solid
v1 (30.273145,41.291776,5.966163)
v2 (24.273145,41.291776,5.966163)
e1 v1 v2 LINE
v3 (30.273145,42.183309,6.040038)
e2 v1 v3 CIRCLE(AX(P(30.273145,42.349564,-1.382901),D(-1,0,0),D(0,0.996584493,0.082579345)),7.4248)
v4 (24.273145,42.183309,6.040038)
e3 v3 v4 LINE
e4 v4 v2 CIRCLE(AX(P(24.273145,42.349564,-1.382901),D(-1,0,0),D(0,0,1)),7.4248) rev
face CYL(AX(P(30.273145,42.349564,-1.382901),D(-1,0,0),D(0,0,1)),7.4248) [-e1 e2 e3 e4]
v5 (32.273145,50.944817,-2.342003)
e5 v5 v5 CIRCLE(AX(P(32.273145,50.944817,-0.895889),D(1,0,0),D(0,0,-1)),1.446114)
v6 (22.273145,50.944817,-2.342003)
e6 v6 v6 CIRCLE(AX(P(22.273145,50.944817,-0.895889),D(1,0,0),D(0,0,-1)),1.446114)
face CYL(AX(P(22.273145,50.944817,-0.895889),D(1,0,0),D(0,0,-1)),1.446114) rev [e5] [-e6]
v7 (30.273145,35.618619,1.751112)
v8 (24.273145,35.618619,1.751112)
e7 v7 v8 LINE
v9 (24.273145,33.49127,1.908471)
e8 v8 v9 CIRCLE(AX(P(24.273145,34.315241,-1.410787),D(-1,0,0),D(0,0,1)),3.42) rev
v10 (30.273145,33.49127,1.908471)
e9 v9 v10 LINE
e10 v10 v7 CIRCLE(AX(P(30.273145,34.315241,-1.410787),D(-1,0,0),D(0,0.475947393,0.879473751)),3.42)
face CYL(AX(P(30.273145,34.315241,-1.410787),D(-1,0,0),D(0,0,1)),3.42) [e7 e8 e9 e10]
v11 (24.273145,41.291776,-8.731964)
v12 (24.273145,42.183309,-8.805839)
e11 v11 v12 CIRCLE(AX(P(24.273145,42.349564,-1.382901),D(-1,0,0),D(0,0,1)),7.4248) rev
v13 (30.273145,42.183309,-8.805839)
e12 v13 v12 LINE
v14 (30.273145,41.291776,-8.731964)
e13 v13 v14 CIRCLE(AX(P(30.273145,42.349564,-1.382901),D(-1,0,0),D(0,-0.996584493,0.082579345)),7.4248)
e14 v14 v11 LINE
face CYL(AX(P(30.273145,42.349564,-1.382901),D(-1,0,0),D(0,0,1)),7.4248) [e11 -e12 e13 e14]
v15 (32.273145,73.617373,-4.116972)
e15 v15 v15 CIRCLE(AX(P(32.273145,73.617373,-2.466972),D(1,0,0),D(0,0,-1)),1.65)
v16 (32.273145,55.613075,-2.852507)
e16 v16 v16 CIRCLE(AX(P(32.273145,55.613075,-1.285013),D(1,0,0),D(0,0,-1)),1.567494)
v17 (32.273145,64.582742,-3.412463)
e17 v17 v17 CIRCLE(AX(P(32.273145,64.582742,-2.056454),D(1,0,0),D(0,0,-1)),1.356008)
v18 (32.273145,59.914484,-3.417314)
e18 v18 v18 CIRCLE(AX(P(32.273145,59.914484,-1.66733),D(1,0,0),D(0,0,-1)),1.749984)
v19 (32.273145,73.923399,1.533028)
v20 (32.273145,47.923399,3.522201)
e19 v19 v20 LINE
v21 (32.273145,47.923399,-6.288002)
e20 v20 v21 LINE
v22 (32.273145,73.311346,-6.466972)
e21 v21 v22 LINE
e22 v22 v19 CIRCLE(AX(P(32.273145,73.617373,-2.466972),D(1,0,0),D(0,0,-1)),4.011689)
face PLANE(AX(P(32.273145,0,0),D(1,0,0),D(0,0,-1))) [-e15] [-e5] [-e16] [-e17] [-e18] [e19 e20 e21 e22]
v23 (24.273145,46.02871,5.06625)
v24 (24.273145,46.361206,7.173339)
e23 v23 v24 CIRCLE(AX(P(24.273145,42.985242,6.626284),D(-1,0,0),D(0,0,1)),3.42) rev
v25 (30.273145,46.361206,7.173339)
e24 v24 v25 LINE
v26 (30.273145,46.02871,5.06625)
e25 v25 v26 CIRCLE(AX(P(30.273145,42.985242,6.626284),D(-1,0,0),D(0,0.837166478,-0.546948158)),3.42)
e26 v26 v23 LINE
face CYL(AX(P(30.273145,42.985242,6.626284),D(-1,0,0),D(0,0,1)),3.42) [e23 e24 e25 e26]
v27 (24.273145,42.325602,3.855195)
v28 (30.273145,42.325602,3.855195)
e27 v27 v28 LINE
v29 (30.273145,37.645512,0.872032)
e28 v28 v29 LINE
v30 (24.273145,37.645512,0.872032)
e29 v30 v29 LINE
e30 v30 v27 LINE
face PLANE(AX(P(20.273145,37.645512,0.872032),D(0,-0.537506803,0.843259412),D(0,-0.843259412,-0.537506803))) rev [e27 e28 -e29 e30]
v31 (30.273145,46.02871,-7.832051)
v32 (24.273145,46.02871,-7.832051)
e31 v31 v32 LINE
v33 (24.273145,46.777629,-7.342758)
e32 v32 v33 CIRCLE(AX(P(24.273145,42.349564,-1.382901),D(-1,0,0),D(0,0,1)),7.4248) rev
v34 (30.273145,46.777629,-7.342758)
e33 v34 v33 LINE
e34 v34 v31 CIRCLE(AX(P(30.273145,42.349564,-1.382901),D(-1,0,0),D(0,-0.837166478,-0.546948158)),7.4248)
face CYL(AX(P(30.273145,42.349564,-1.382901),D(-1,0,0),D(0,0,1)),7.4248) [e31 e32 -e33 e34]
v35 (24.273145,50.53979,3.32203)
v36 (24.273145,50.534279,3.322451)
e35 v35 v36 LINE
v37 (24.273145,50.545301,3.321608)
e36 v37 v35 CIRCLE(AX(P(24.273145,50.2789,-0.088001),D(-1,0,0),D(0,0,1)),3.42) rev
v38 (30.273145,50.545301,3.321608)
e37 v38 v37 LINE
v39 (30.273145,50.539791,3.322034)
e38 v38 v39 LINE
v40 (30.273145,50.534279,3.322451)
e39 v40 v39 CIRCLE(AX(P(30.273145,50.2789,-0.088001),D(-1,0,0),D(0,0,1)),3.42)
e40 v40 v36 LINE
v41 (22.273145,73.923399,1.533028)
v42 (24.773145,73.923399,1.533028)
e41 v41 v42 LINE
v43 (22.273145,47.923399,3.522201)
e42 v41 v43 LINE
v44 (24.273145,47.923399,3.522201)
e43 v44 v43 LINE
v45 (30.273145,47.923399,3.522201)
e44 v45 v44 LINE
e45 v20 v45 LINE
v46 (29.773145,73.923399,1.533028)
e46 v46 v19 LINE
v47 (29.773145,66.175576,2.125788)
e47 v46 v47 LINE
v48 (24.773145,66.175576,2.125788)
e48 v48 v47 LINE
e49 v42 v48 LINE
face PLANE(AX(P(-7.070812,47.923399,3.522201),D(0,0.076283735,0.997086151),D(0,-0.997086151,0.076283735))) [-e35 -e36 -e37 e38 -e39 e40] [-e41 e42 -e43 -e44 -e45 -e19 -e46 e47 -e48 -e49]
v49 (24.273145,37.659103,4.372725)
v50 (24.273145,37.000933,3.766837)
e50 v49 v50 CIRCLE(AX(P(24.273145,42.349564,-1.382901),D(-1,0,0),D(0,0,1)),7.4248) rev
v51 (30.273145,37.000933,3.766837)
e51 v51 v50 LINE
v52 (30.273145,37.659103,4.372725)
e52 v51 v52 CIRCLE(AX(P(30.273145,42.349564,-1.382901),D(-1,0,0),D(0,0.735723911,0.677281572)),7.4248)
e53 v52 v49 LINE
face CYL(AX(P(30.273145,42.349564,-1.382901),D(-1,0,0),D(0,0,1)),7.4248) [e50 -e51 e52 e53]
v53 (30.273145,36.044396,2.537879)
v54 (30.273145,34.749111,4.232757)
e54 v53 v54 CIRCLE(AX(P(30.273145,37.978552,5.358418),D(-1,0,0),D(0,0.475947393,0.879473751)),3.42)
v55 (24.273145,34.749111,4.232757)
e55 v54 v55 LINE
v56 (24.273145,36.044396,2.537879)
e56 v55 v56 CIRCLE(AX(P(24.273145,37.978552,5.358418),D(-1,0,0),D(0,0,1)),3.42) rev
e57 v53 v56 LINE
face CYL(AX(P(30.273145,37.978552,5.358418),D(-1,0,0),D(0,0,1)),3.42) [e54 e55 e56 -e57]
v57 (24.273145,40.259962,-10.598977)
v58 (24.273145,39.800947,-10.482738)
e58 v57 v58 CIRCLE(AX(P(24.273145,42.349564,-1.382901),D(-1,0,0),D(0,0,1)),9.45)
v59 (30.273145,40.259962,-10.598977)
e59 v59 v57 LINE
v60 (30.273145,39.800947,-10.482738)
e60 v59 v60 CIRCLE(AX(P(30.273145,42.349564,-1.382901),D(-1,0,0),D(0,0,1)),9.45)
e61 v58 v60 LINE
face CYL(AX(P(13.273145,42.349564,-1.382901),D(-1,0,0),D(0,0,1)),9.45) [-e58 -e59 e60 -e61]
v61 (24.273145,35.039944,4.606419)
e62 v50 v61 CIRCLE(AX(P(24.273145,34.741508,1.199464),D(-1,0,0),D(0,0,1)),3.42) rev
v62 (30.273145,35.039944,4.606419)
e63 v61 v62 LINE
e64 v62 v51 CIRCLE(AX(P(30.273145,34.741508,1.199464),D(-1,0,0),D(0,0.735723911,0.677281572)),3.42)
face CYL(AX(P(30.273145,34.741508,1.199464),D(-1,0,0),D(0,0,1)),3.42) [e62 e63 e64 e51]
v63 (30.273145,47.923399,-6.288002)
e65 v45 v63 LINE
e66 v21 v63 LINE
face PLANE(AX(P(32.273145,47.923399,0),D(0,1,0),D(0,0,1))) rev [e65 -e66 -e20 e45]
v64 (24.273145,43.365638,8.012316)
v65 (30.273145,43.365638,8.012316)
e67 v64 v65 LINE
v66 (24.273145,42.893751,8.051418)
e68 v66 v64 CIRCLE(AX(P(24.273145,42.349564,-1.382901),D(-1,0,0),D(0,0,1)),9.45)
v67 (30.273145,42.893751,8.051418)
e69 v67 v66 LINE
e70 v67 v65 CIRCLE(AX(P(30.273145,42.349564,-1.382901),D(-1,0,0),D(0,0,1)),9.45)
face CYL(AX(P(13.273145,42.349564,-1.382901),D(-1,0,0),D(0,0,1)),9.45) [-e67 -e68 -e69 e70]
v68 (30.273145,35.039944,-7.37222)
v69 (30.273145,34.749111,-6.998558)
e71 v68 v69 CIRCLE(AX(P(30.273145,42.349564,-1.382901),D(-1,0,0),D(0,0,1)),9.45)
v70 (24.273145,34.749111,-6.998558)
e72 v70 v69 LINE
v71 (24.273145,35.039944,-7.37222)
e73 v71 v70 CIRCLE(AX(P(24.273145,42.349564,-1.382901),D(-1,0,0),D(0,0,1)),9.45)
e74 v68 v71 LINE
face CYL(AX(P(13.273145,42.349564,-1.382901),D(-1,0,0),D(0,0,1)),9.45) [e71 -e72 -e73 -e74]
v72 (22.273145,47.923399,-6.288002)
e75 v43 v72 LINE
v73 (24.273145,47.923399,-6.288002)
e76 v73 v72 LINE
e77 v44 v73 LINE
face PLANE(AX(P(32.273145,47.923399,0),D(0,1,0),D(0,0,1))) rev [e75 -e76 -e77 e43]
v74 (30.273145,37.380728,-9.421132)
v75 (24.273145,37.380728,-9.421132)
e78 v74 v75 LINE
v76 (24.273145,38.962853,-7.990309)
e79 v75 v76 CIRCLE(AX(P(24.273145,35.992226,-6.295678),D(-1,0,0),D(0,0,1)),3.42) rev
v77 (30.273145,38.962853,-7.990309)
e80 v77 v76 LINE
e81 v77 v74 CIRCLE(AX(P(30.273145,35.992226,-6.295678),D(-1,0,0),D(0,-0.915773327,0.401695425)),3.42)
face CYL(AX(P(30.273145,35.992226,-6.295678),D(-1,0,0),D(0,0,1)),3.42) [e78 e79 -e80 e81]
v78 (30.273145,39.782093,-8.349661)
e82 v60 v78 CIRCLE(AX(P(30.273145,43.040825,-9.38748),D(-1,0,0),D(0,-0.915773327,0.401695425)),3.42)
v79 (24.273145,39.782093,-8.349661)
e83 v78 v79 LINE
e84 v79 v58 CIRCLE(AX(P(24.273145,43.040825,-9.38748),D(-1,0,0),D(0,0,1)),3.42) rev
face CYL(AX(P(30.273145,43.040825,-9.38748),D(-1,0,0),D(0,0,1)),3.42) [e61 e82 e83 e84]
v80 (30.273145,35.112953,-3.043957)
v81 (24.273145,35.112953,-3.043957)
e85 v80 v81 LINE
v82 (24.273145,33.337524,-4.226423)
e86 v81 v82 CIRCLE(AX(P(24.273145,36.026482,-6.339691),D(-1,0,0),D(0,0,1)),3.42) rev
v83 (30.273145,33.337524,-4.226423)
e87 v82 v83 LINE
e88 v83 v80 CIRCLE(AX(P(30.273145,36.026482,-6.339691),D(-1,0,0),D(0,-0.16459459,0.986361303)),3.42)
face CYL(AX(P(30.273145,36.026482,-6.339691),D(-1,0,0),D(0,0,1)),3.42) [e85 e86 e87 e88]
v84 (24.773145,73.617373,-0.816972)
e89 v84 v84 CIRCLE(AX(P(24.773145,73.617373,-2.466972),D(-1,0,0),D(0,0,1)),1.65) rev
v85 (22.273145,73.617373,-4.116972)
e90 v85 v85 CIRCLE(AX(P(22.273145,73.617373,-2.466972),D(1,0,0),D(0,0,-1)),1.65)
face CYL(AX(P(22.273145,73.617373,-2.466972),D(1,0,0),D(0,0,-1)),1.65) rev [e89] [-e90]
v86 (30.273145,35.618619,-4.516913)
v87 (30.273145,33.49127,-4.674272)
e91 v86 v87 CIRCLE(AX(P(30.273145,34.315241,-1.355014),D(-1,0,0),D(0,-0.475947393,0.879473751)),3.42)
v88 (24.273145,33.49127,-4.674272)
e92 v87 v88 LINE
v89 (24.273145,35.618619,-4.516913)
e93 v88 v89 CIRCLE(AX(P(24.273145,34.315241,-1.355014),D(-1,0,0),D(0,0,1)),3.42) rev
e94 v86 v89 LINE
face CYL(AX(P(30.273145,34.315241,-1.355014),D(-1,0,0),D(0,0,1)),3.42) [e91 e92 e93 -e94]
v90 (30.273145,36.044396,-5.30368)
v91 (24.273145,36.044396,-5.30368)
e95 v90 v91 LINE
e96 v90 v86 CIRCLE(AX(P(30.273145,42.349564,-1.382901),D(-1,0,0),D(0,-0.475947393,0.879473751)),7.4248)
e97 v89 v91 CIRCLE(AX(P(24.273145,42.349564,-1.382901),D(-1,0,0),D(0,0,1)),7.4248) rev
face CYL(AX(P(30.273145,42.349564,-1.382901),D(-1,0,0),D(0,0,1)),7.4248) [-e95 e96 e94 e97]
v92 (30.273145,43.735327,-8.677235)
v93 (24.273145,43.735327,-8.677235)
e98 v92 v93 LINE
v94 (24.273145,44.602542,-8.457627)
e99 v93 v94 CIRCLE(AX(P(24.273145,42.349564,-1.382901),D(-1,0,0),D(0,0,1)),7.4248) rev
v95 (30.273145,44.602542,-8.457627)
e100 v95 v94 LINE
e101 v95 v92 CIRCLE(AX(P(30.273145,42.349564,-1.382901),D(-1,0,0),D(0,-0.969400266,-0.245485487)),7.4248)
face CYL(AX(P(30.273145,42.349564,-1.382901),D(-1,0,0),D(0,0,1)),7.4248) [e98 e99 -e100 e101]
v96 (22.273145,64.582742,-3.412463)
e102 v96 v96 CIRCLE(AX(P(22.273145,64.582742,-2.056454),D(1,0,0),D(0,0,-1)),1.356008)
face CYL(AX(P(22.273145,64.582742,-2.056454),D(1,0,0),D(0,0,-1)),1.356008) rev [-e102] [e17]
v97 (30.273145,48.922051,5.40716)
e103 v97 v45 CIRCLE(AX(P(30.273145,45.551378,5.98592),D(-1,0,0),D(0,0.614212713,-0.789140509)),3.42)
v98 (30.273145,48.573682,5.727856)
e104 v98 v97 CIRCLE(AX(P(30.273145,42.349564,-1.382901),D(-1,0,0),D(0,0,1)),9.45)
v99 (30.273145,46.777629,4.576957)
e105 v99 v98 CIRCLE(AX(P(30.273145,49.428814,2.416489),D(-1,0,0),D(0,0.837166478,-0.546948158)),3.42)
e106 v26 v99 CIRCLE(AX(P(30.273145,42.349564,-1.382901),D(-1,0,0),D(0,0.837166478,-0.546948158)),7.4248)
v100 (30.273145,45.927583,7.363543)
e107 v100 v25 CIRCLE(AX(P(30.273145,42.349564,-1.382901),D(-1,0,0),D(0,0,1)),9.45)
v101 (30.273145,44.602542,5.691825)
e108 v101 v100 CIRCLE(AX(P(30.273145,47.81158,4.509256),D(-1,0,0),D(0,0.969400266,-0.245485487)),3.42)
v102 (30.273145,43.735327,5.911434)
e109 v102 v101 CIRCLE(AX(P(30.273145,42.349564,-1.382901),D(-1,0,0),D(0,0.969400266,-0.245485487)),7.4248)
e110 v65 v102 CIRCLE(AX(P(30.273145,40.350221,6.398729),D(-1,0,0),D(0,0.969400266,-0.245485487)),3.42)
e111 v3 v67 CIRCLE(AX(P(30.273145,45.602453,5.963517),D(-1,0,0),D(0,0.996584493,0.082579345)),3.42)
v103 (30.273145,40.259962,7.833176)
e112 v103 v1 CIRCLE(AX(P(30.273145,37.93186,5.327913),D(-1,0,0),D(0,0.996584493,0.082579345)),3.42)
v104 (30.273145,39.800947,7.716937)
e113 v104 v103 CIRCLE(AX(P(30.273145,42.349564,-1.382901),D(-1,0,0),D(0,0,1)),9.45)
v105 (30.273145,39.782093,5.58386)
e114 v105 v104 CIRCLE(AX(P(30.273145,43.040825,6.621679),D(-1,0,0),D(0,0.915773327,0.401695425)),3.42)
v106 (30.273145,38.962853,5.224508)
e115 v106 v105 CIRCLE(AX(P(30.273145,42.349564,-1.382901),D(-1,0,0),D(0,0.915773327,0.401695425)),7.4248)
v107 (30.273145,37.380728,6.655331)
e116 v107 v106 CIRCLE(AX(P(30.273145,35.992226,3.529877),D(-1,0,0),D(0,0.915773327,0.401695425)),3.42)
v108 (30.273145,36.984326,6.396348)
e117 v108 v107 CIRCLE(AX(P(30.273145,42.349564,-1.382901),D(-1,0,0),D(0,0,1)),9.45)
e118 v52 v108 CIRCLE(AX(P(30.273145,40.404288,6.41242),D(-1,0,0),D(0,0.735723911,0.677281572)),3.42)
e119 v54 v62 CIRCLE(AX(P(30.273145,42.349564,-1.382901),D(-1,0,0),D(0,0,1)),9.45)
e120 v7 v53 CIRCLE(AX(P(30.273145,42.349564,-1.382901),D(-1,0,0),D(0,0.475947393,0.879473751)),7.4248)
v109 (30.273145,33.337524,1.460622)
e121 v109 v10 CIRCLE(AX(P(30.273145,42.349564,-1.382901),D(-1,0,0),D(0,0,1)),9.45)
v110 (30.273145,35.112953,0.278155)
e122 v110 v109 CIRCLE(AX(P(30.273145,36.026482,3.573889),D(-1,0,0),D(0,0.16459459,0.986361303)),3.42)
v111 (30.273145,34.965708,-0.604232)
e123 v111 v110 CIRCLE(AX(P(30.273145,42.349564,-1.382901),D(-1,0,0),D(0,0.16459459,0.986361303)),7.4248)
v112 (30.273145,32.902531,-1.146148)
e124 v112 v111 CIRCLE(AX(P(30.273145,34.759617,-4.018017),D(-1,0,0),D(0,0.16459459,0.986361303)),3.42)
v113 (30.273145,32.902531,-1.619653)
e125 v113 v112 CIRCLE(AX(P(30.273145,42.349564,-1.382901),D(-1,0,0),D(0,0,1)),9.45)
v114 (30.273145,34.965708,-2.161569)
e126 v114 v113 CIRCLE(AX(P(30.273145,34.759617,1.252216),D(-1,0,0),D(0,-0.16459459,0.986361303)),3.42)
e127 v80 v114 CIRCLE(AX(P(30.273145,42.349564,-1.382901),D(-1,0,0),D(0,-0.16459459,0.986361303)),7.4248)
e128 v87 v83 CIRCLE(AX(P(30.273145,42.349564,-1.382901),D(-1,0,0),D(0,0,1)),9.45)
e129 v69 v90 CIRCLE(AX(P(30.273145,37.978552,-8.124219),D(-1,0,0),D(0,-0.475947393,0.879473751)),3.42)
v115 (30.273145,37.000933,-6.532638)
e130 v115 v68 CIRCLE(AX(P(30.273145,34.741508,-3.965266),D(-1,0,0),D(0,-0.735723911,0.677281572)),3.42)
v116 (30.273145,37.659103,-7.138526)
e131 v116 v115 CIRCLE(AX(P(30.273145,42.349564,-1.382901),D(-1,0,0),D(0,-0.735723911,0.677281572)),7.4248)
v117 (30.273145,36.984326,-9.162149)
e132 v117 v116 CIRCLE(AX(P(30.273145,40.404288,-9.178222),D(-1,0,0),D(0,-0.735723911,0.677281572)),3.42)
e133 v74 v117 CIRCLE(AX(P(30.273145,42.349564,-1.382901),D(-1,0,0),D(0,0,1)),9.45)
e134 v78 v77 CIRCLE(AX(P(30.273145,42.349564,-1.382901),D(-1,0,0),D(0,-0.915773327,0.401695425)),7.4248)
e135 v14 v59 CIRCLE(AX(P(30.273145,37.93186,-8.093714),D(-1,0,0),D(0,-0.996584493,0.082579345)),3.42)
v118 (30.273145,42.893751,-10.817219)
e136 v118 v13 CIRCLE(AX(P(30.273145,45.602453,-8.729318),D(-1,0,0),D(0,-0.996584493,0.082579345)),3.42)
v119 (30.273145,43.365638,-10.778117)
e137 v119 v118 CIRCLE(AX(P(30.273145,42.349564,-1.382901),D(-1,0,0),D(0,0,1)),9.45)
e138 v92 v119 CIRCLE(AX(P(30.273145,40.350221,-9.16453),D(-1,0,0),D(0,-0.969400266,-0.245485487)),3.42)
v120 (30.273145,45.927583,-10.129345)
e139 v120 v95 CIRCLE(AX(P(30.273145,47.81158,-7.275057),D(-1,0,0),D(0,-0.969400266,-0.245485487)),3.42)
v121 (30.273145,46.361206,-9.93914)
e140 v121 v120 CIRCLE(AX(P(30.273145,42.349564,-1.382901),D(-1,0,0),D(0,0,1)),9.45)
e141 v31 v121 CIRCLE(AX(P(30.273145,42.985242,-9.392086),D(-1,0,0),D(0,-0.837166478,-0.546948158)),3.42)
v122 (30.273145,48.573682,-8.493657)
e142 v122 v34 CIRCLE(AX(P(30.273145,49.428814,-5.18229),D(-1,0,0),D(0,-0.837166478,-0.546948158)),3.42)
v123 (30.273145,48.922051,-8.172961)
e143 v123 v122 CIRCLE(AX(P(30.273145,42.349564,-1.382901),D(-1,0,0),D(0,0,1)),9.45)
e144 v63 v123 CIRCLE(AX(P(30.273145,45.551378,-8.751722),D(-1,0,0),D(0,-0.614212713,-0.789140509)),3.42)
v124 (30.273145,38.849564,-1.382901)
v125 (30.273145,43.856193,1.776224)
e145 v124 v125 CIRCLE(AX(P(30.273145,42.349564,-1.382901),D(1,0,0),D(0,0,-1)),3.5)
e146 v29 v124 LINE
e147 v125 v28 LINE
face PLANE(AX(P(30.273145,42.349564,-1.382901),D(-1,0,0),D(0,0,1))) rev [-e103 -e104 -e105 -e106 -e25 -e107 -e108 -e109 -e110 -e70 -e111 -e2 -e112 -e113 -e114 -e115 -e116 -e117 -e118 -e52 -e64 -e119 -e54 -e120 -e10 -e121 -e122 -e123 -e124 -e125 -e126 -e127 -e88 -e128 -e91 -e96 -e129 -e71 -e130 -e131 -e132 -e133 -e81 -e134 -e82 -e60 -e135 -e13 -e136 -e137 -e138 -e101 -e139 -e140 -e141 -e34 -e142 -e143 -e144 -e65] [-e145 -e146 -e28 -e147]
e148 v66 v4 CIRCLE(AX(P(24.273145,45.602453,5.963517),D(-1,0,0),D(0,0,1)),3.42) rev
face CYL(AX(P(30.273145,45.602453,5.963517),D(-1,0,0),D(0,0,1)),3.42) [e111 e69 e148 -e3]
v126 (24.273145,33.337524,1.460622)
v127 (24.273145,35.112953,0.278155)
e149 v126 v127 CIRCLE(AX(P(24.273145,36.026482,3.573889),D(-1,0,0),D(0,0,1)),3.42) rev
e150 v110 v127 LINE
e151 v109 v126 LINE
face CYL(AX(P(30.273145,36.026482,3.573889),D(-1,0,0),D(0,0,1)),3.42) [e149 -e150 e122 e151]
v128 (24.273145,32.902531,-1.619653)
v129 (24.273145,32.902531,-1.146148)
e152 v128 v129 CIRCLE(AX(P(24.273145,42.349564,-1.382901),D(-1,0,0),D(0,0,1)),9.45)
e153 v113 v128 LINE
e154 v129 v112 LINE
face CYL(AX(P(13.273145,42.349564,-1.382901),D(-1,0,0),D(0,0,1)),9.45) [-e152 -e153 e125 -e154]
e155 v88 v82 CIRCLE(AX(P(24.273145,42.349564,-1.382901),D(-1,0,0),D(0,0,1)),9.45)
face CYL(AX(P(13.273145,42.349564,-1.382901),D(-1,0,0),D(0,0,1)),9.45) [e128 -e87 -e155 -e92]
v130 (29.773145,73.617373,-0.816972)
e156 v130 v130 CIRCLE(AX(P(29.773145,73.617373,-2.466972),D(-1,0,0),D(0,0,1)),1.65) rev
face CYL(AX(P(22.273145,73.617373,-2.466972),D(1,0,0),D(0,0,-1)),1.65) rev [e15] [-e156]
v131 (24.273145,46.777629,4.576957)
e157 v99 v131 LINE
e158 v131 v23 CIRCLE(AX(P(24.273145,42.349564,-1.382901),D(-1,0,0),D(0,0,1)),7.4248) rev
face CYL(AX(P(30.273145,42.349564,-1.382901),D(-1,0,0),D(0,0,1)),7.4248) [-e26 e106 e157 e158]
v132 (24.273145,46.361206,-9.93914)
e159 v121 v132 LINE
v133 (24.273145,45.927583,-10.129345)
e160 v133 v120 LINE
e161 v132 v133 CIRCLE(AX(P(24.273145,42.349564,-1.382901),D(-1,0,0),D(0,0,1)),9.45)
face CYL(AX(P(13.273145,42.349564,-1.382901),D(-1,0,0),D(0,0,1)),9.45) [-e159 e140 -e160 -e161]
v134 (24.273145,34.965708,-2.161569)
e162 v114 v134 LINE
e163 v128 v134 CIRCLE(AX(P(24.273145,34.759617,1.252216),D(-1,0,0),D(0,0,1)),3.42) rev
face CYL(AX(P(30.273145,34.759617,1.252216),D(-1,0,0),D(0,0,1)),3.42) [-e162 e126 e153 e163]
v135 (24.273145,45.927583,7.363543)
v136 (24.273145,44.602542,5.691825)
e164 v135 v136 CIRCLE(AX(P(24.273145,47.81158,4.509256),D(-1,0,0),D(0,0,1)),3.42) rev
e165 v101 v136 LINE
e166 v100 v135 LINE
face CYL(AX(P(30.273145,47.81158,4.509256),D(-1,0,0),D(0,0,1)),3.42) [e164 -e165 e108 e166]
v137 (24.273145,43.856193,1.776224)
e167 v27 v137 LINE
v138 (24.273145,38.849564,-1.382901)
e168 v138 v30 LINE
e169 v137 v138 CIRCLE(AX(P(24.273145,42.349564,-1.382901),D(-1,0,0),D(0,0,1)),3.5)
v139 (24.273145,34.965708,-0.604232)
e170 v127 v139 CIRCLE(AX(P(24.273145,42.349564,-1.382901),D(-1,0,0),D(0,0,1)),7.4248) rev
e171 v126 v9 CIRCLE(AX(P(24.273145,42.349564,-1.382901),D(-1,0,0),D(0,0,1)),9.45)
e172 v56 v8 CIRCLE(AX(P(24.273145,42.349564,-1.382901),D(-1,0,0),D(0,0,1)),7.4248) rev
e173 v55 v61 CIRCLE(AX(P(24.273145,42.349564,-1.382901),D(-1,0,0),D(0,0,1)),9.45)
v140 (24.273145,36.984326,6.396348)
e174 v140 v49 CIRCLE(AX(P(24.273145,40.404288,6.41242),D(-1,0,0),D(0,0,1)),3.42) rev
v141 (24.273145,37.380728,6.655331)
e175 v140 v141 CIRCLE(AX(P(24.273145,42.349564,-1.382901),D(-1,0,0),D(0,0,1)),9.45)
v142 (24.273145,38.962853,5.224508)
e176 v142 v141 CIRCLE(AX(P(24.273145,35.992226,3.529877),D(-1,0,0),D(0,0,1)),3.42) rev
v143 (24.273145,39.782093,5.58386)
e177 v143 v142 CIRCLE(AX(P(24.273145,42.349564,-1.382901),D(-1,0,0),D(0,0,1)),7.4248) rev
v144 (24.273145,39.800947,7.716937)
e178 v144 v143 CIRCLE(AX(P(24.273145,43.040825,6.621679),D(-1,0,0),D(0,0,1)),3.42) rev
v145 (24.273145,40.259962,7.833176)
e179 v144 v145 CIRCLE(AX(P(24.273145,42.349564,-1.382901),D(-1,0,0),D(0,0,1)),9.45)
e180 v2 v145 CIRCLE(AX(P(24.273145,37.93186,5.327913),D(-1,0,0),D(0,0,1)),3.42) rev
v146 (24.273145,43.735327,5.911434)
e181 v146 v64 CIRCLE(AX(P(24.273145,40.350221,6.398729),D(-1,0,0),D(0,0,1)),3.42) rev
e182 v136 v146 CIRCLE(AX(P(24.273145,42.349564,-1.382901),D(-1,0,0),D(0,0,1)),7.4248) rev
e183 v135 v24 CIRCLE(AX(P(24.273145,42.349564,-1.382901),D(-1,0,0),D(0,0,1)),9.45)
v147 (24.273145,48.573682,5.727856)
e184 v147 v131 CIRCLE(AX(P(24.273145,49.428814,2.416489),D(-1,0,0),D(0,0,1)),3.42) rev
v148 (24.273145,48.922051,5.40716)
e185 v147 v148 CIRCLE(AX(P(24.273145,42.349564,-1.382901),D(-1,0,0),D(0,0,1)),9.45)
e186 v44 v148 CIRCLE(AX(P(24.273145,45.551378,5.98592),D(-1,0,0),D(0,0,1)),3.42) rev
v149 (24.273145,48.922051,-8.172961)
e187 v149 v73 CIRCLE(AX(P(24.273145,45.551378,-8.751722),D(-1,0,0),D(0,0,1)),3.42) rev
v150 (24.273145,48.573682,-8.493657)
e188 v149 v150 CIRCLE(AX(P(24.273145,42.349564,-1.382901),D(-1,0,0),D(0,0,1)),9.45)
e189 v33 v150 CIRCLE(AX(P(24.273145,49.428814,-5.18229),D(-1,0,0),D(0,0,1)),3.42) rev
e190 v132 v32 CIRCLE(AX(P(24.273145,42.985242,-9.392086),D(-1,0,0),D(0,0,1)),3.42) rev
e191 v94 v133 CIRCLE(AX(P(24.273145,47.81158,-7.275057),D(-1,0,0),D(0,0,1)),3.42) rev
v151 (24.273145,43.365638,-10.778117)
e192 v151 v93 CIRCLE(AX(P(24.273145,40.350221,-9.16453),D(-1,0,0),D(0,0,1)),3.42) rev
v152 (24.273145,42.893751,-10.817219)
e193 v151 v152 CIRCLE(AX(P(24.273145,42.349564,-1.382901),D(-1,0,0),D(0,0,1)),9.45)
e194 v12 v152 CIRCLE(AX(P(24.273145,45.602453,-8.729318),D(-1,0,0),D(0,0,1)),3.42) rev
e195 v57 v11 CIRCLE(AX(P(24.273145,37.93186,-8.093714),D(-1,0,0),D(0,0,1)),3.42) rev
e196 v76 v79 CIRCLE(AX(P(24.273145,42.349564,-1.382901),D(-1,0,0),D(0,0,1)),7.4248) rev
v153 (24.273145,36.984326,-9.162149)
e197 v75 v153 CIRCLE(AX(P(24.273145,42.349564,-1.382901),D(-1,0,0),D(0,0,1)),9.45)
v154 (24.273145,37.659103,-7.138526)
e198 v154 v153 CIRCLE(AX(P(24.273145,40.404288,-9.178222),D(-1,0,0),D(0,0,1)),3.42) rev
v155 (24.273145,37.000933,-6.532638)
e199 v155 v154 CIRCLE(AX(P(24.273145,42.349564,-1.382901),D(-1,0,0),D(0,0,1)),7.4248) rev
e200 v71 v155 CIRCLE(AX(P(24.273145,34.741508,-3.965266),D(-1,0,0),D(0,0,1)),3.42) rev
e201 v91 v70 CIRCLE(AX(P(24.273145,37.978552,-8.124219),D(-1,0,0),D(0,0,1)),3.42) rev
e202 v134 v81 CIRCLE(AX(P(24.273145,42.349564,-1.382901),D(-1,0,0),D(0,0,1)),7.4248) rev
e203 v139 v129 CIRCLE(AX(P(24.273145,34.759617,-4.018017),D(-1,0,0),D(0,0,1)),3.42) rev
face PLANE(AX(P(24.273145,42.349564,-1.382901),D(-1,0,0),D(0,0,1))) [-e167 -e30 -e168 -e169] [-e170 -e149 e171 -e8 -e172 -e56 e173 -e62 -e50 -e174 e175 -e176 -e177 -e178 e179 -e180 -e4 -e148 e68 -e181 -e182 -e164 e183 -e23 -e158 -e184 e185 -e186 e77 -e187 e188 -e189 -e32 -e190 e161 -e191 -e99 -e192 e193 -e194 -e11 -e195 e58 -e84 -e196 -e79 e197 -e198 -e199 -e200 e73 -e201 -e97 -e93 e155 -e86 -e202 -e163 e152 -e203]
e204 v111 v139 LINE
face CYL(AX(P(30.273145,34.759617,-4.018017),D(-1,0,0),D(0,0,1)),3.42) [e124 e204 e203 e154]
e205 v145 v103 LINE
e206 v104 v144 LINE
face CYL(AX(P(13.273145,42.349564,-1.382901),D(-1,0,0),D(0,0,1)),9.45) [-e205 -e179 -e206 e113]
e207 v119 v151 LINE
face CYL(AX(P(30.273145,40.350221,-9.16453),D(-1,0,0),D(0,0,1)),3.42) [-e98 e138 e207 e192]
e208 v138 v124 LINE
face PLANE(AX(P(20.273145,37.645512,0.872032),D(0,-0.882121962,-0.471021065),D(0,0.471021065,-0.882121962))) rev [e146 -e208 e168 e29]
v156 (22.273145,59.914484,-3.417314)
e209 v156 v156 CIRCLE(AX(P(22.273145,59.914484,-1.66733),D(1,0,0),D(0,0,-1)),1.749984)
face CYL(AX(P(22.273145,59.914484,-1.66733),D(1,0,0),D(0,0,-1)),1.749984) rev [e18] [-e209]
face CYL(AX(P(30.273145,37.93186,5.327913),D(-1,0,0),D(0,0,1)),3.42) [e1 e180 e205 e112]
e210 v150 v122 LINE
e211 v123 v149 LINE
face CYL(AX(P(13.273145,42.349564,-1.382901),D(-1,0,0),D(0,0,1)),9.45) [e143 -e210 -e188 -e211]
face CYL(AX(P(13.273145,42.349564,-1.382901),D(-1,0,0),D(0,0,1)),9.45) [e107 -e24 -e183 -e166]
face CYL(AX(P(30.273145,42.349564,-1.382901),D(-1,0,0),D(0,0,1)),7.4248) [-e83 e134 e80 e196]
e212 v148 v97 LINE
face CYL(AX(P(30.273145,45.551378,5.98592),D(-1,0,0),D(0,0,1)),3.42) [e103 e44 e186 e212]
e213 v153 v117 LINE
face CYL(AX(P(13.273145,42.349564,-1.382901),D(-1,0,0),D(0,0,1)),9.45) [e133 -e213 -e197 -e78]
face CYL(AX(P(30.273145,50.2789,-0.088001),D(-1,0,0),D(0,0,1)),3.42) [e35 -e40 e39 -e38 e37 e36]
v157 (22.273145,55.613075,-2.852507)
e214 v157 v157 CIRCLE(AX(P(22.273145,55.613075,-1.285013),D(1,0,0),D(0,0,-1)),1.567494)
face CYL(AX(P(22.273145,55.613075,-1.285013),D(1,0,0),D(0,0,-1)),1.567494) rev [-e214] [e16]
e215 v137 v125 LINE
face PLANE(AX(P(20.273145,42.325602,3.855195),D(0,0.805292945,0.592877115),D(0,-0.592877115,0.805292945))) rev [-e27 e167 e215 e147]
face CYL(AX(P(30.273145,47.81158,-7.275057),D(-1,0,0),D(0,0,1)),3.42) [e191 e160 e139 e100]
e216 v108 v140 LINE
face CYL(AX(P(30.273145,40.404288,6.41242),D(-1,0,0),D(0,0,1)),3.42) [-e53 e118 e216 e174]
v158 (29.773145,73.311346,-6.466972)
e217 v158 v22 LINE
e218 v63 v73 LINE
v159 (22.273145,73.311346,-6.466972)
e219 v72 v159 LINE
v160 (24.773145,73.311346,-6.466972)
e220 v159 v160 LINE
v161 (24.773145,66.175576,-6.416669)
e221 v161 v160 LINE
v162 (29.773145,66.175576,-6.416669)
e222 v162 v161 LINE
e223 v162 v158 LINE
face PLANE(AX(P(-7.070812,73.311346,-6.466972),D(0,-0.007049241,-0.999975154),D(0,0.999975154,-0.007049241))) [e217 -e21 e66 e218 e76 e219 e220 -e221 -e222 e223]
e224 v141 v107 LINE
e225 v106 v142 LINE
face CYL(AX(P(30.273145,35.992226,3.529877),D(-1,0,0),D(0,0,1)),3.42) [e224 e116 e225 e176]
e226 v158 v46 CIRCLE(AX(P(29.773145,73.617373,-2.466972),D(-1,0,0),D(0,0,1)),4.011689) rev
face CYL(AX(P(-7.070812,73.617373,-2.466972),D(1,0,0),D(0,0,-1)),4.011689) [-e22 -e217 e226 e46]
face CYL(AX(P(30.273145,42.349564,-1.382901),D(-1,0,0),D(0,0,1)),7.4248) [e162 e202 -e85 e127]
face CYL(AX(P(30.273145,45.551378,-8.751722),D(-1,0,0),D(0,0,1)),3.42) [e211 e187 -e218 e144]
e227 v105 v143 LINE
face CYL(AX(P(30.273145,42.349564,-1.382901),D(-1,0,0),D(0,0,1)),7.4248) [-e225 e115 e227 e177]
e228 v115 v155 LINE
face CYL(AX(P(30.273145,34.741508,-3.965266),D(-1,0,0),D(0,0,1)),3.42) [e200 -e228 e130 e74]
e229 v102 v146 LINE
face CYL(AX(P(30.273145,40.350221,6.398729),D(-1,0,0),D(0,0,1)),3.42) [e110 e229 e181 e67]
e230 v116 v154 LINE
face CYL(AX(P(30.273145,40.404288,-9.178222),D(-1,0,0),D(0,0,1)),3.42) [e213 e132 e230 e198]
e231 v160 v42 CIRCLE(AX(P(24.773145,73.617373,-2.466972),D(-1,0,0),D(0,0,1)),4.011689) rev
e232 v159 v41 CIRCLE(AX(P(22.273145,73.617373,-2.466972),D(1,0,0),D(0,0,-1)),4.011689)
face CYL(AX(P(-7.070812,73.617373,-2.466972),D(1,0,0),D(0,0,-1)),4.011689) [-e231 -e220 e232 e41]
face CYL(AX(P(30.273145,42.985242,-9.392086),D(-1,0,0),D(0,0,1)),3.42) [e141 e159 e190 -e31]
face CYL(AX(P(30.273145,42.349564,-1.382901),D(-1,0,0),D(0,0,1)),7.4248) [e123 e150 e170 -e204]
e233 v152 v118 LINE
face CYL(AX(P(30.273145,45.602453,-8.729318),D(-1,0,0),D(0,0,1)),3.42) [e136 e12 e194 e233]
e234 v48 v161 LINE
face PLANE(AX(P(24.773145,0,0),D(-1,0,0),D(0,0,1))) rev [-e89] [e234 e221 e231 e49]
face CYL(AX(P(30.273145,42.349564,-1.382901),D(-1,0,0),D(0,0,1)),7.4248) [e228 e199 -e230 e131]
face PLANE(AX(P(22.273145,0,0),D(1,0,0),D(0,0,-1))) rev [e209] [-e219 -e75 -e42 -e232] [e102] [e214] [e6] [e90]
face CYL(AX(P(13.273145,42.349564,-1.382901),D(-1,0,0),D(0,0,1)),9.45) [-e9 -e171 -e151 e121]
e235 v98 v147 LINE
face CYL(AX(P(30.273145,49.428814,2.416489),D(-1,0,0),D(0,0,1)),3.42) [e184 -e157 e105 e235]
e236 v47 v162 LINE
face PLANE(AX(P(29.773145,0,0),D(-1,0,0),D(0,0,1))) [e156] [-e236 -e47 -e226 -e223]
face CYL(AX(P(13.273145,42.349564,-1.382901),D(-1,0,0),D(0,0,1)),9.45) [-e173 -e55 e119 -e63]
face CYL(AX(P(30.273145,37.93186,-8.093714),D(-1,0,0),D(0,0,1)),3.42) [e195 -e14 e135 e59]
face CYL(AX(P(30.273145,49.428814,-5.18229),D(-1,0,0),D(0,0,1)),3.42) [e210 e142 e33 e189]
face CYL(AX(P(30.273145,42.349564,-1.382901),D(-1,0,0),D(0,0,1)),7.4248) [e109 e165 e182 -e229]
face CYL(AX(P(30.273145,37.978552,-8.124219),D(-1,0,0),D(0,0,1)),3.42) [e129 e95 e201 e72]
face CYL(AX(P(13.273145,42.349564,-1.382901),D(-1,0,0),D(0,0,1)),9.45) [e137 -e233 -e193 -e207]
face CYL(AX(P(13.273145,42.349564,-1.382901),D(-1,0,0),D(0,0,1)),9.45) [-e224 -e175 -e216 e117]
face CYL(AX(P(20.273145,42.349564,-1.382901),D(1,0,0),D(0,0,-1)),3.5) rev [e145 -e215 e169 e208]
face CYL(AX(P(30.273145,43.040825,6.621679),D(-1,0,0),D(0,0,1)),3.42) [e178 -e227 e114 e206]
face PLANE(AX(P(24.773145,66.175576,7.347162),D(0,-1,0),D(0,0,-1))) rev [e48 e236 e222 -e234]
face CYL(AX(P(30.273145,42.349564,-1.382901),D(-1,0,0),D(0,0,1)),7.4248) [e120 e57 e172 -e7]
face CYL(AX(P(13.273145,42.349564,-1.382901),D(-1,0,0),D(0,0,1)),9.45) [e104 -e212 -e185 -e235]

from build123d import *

# Parameters (mm, degrees)
SPUR_START             = -32.726855157
SPUR_GEAR_GB_OUTLINE_R = 22.5
SPUR_GEAR_GB_DEPTH     = 75
SKETCH_2_R             = 56.152658256
CUT_EXTRUDE_1_DEPTH    = 45
EXTRUDE_1_DEPTH        = 30
EXTRUDE_START          = -30
SKETCH_5_R             = 22.5
EXTRUDE_2_DEPTH        = 30
SCALE_1_SCALE          = 0.2
CUT_EXTRUDE_3_DEPTH    = 10
EXTRUDE_3_DEPTH        = 5
SKETCH_8_R             = 1.65
CUT_EXTRUDE_4_DEPTH    = 10
SKETCH_9_W             = 18.454746183
SKETCH_9_H             = 13.449677925
CUT_EXTRUDE_5_DEPTH    = 2.5
SKETCH_10_R            = 1.446114005
SKETCH_10_R_2          = 1.567494057
SKETCH_10_R_3          = 1.749983797
SKETCH_10_R_4          = 1.35600832
CUT_EXTRUDE_6_DEPTH    = 80.014451116


# Read off the part's stored shape, not the designer's step: spur gear_gb
with BuildPart() as part:
    # spur gear_gb outline → spur gear_gb (new body)
    with BuildSketch(Plane.YZ.offset(SPUR_START)):
        with BuildLine():
            ThreePointArc((32.862431273, 33.858374177), (32.001554259, 34.671025411), (31.120587981, 35.461853886))
            ThreePointArc((31.120587981, 35.461853886), (26.170323532, 33.302671085), (22.140322459, 29.707357493))
            ThreePointArc((22.140322459, 29.707357493), (20.304903422, 30.987038971), (18.395725829, 32.153824573))
            ThreePointArc((18.395725829, 32.153824573), (20.069385125, 37.288613083), (20.058208562, 42.689267077))
            ThreePointArc((20.058208562, 42.689267077), (18.980108815, 43.178360316), (17.890094133, 43.64029024))
            ThreePointArc((17.890094133, 43.64029024), (13.909134176, 39.99074968), (11.264886092, 35.281700885))
            ThreePointArc((11.264886092, 35.281700885), (9.113403224, 35.896086104), (6.928815473, 36.379743093))
            ThreePointArc((6.928815473, 36.379743093), (6.844528189, 41.779750883), (5.080367717, 46.884153523))
            ThreePointArc((5.080367717, 46.884153523), (3.901874073, 46.996687926), (2.720930993, 47.079662024))
            ThreePointArc((2.720930993, 47.079662024), (0.14067431, 42.335248053), (-0.831275476, 37.022762562))
            ThreePointArc((-0.831275476, 37.022762562), (-3.065675621, 36.90527335), (-5.28893955, 36.653389986))
            ThreePointArc((-5.28893955, 36.653389986), (-7.12203958, 41.733442422), (-10.448009799, 45.988452479))
            ThreePointArc((-10.448009799, 45.988452479), (-11.599189267, 45.712233197), (-12.74308724, 45.407259939))
            ThreePointArc((-12.74308724, 45.407259939), (-13.643029801, 40.082103428), (-12.837355447, 34.741871474))
            ThreePointArc((-12.837355447, 34.741871474), (-14.912540945, 33.90523961), (-16.933555907, 32.945111364))
            ThreePointArc((-16.933555907, 32.945111364), (-20.316823851, 37.154705941), (-24.844183336, 40.099227051))
            ThreePointArc((-24.844183336, 40.099227051), (-25.843300471, 39.464186729), (-26.826194241, 38.804314699))
            ThreePointArc((-26.826194241, 38.804314699), (-25.948299939, 33.475478984), (-23.452308764, 28.686197563))
            ThreePointArc((-23.452308764, 28.686197563), (-25.143401065, 27.221085091), (-26.74315873, 25.656756756))
            ThreePointArc((-26.74315873, 25.656756756), (-31.309965009, 28.539718582), (-36.548104111, 29.854666195))
            ThreePointArc((-36.548104111, 29.854666195), (-37.286889069, 28.929621306), (-38.002266845, 27.986357877))
            ThreePointArc((-38.002266845, 27.986357877), (-35.44166915, 23.231304993), (-31.525840525, 19.51196706))
            ThreePointArc((-31.525840525, 19.51196706), (-32.64958354, 17.577141651), (-33.654725342, 15.578132475))
            ThreePointArc((-33.654725342, 15.578132475), (-38.910185635, 16.822047902), (-44.291470704, 16.364927041))
            ThreePointArc((-44.291470704, 16.364927041), (-44.68986467, 15.250120552), (-45.060204171, 14.125682952))
            ThreePointArc((-45.060204171, 14.125682952), (-41.094383574, 10.459696662), (-36.183058293, 8.213350193))
            ThreePointArc((-36.183058293, 8.213350193), (-36.617677028, 6.018480201), (-36.919280256, 3.801413847))
            ThreePointArc((-36.919280256, 3.801413847), (-42.293883893, 3.271485337), (-47.235169193, 1.091832139))
            ThreePointArc((-47.235169193, 1.091832139), (-47.25, -0.091929368), (-47.235169193, -1.275690876))
            ThreePointArc((-47.235169193, -1.275690876), (-42.293883893, -3.455344074), (-36.919280256, -3.985272584))
            ThreePointArc((-36.919280256, -3.985272584), (-36.617677028, -6.202338938), (-36.183058293, -8.39720893))
            ThreePointArc((-36.183058293, -8.39720893), (-41.094383574, -10.643555399), (-45.060204171, -14.309541689))
            ThreePointArc((-45.060204171, -14.309541689), (-44.68986467, -15.433979288), (-44.291470704, -16.548785777))
            ThreePointArc((-44.291470704, -16.548785777), (-38.910185635, -17.005906639), (-33.654725342, -15.761991212))
            ThreePointArc((-33.654725342, -15.761991212), (-32.64958354, -17.761000388), (-31.525840525, -19.695825796))
            ThreePointArc((-31.525840525, -19.695825796), (-35.44166915, -23.41516373), (-38.002266845, -28.170216613))
            ThreePointArc((-38.002266845, -28.170216613), (-37.286889069, -29.113480043), (-36.548104111, -30.038524932))
            ThreePointArc((-36.548104111, -30.038524932), (-31.309965009, -28.723577319), (-26.74315873, -25.840615493))
            ThreePointArc((-26.74315873, -25.840615493), (-25.143401065, -27.404943828), (-23.452308764, -28.870056299))
            ThreePointArc((-23.452308764, -28.870056299), (-25.948299939, -33.65933772), (-26.826194241, -38.988173435))
            ThreePointArc((-26.826194241, -38.988173435), (-25.843300471, -39.648045466), (-24.844183336, -40.283085788))
            ThreePointArc((-24.844183336, -40.283085788), (-20.316823851, -37.338564677), (-16.933555907, -33.128970101))
            ThreePointArc((-16.933555907, -33.128970101), (-14.912540945, -34.089098347), (-12.837355447, -34.925730211))
            ThreePointArc((-12.837355447, -34.925730211), (-13.643029801, -40.265962164), (-12.74308724, -45.591118675))
            ThreePointArc((-12.74308724, -45.591118675), (-11.599189267, -45.896091934), (-10.448009799, -46.172311216))
            ThreePointArc((-10.448009799, -46.172311216), (-7.12203958, -41.917301159), (-5.28893955, -36.837248723))
            ThreePointArc((-5.28893955, -36.837248723), (-3.065675621, -37.089132087), (-0.831275476, -37.206621299))
            ThreePointArc((-0.831275476, -37.206621299), (0.14067431, -42.51910679), (2.720930993, -47.263520761))
            ThreePointArc((2.720930993, -47.263520761), (3.901874073, -47.180546663), (5.080367717, -47.06801226))
            ThreePointArc((5.080367717, -47.06801226), (6.844528189, -41.96360962), (6.928815473, -36.56360183))
            ThreePointArc((6.928815473, -36.56360183), (9.113403224, -36.079944841), (11.264886092, -35.465559622))
            ThreePointArc((11.264886092, -35.465559622), (13.909134176, -40.174608417), (17.890094133, -43.824148977))
            ThreePointArc((17.890094133, -43.824148977), (18.980108815, -43.362219053), (20.058208562, -42.873125814))
            ThreePointArc((20.058208562, -42.873125814), (20.069385125, -37.47247182), (18.395725829, -32.33768331))
            ThreePointArc((18.395725829, -32.33768331), (20.304903422, -31.170897707), (22.140322459, -29.891216229))
            ThreePointArc((22.140322459, -29.891216229), (26.170323532, -33.486529822), (31.120587981, -35.645712623))
            ThreePointArc((31.120587981, -35.645712623), (32.001554259, -34.854884148), (32.862431273, -34.042232914))
            ThreePointArc((32.862431273, -34.042232914), (31.119412774, -28.930572226), (27.869173851, -24.617437006))
            ThreePointArc((27.869173851, -24.617437006), (29.296052271, -22.893962115), (30.616511345, -21.087657722))
            ThreePointArc((30.616511345, -21.087657722), (35.595552259, -23.179628097), (40.978683235, -23.614472179))
            ThreePointArc((40.978683235, -23.614472179), (41.555134745, -22.58044369), (42.105499643, -21.532297832))
            ThreePointArc((42.105499643, -21.532297832), (38.797169181, -17.2635582), (34.322564452, -14.239471396))
            ThreePointArc((34.322564452, -14.239471396), (35.112519281, -12.146072463), (35.774926162, -10.008886264))
            ThreePointArc((35.774926162, -10.008886264), (41.163450577, -10.370815972), (46.396102311, -9.034199232))
            ThreePointArc((46.396102311, -9.034199232), (46.605571586, -7.869023759), (46.785783792, -6.698966145))
            ThreePointArc((46.785783792, -6.698966145), (42.270650308, -3.735731746), (37.056572625, -2.328400087))
            ThreePointArc((37.056572625, -2.328400087), (37.124, -0.091929368), (37.056572625, 2.14454135))
            ThreePointArc((37.056572625, 2.14454135), (42.270650308, 3.551873009), (46.785783792, 6.515107408))
            ThreePointArc((46.785783792, 6.515107408), (46.605571586, 7.685165023), (46.396102311, 8.850340496))
            ThreePointArc((46.396102311, 8.850340496), (41.163450577, 10.186957235), (35.774926162, 9.825027527))
            ThreePointArc((35.774926162, 9.825027527), (35.112519281, 11.962213726), (34.322564452, 14.05561266))
            ThreePointArc((34.322564452, 14.05561266), (38.797169181, 17.079699464), (42.105499643, 21.348439095))
            ThreePointArc((42.105499643, 21.348439095), (41.555134745, 22.396584953), (40.978683235, 23.430613443))
            ThreePointArc((40.978683235, 23.430613443), (35.595552259, 22.99576936), (30.616511345, 20.903798985))
            ThreePointArc((30.616511345, 20.903798985), (29.296052271, 22.710103378), (27.869173851, 24.433578269))
            ThreePointArc((27.869173851, 24.433578269), (31.119412774, 28.746713489), (32.862431273, 33.858374177))
        make_face()
        with Locations((0, -0.091929368)):
            Circle(SPUR_GEAR_GB_OUTLINE_R, mode=Mode.SUBTRACT)
    extrude(amount=SPUR_GEAR_GB_DEPTH)

    # 草图2 → 切除-拉伸1 (cut)
    with BuildSketch(Plane.ZY.offset(32.726855157)):
        with Locations((-0.091929368, 0)):
            Circle(SKETCH_2_R)
    extrude(amount=-CUT_EXTRUDE_1_DEPTH, mode=Mode.SUBTRACT)

    # 草图4 → 凸台-拉伸1 (add)
    with BuildSketch(Plane(origin=(42.273144843, 0, 0), x_dir=(0, 0, -1), z_dir=(1, 0, 0))):
        with BuildLine():
            Line((-24.433578269, 27.869173851), (-23.430613443, 40.978683235))
            Line((-23.430613443, 40.978683235), (-14.487711984, 157.869173851))
            ThreePointArc((-14.487711984, 157.869173851), (7.042421291, 176.339040577), (25.512288016, 154.808907302))
            Line((25.512288016, 154.808907302), (24.617437006, 27.869173851))
            Line((24.617437006, 27.869173851), (-24.433578269, 27.869173851))
        make_face()
    extrude(amount=-EXTRUDE_1_DEPTH)

    # 草图5 → 凸台-拉伸2 (add)
    with BuildSketch(Plane(origin=(42.273144843, 0, 0), x_dir=(0, 0, -1), z_dir=(1, 0, 0)).offset(EXTRUDE_START)):
        with Locations((0.091929368, 0)):
            Circle(SKETCH_5_R)
    extrude(amount=EXTRUDE_2_DEPTH)


with BuildPart() as part_1:
    # 缩放比例1: scaled about (27.273144843, 52.936955481, -1.705643422)
    add(part.part.scale(SCALE_1_SCALE).moved(Location((21.818515874, 42.349564385, -1.364514738))))

    # 草图6 → 切除-拉伸3 (cut)
    with BuildSketch(Plane(origin=(30.273144843, 0, 0), x_dir=(0, 0, -1), z_dir=(1, 0, 0))):
        with BuildLine():
            Line((-0.872032296, 37.645512175), (-3.855195053, 42.325601914))
            Line((-3.855195053, 42.325601914), (-1.776224322, 43.856192956))
            ThreePointArc((-1.776224322, 43.856192956), (4.342900611, 44.217290275), (1.382900611, 38.849564385))
            Line((1.382900611, 38.849564385), (-0.872032296, 37.645512175))
        make_face()
    extrude(amount=-CUT_EXTRUDE_3_DEPTH, mode=Mode.SUBTRACT)

    # 草图7 → 凸台-拉伸3 (add, symmetric)
    with BuildSketch(Plane(origin=(27.273144843, 0, 0), x_dir=(0, 0, -1), z_dir=(1, 0, 0))):
        with BuildLine():
            Line((6.288002139, 47.923399155), (6.466972341, 73.311345845))
            ThreePointArc((6.466972341, 73.311345845), (2.772998996, 77.6173725), (-1.533027659, 73.923399155))
            Line((-1.533027659, 73.923399155), (-3.321607951, 50.545301032))
            Line((-3.321607951, 50.545301032), (-3.322451181, 50.53427937))
            Line((-3.322451181, 50.53427937), (-3.522200916, 47.923399155))
            Line((-3.522200916, 47.923399155), (6.288002139, 47.923399155))
        make_face()
    extrude(amount=EXTRUDE_3_DEPTH, both=True)

    # 草图8 → 切除-拉伸4 (cut)
    with BuildSketch(Plane(origin=(32.273144843, 0, 0), x_dir=(0, 0, -1), z_dir=(1, 0, 0))):
        with Locations((2.466972341, 73.6173725)):
            Circle(SKETCH_8_R)
    extrude(amount=-CUT_EXTRUDE_4_DEPTH, mode=Mode.SUBTRACT)

    # 草图9 → 切除-拉伸5 (cut, symmetric)
    with BuildSketch(Plane(origin=(27.273144843, 0, 0), x_dir=(0, 0, -1), z_dir=(1, 0, 0))):
        with Locations((1.880211444, 72.900415106)):
            Rectangle(SKETCH_9_W, SKETCH_9_H)
    extrude(amount=CUT_EXTRUDE_5_DEPTH, both=True, mode=Mode.SUBTRACT)

    # 草图10 → 切除-拉伸6 (cut, through all)
    with BuildSketch(Plane(origin=(32.273144843, 0, 0), x_dir=(0, 0, -1), z_dir=(1, 0, 0))):
        with Locations((0.89588905, 50.944816989)):
            Circle(SKETCH_10_R)
        with Locations((1.285013172, 55.613074907)):
            Circle(SKETCH_10_R_2)
        with Locations((1.667330314, 59.914483987)):
            Circle(SKETCH_10_R_3)
        with Locations((2.056454436, 64.582741905)):
            Circle(SKETCH_10_R_4)
    extrude(amount=-CUT_EXTRUDE_6_DEPTH, mode=Mode.SUBTRACT)


solid = part_1.part
